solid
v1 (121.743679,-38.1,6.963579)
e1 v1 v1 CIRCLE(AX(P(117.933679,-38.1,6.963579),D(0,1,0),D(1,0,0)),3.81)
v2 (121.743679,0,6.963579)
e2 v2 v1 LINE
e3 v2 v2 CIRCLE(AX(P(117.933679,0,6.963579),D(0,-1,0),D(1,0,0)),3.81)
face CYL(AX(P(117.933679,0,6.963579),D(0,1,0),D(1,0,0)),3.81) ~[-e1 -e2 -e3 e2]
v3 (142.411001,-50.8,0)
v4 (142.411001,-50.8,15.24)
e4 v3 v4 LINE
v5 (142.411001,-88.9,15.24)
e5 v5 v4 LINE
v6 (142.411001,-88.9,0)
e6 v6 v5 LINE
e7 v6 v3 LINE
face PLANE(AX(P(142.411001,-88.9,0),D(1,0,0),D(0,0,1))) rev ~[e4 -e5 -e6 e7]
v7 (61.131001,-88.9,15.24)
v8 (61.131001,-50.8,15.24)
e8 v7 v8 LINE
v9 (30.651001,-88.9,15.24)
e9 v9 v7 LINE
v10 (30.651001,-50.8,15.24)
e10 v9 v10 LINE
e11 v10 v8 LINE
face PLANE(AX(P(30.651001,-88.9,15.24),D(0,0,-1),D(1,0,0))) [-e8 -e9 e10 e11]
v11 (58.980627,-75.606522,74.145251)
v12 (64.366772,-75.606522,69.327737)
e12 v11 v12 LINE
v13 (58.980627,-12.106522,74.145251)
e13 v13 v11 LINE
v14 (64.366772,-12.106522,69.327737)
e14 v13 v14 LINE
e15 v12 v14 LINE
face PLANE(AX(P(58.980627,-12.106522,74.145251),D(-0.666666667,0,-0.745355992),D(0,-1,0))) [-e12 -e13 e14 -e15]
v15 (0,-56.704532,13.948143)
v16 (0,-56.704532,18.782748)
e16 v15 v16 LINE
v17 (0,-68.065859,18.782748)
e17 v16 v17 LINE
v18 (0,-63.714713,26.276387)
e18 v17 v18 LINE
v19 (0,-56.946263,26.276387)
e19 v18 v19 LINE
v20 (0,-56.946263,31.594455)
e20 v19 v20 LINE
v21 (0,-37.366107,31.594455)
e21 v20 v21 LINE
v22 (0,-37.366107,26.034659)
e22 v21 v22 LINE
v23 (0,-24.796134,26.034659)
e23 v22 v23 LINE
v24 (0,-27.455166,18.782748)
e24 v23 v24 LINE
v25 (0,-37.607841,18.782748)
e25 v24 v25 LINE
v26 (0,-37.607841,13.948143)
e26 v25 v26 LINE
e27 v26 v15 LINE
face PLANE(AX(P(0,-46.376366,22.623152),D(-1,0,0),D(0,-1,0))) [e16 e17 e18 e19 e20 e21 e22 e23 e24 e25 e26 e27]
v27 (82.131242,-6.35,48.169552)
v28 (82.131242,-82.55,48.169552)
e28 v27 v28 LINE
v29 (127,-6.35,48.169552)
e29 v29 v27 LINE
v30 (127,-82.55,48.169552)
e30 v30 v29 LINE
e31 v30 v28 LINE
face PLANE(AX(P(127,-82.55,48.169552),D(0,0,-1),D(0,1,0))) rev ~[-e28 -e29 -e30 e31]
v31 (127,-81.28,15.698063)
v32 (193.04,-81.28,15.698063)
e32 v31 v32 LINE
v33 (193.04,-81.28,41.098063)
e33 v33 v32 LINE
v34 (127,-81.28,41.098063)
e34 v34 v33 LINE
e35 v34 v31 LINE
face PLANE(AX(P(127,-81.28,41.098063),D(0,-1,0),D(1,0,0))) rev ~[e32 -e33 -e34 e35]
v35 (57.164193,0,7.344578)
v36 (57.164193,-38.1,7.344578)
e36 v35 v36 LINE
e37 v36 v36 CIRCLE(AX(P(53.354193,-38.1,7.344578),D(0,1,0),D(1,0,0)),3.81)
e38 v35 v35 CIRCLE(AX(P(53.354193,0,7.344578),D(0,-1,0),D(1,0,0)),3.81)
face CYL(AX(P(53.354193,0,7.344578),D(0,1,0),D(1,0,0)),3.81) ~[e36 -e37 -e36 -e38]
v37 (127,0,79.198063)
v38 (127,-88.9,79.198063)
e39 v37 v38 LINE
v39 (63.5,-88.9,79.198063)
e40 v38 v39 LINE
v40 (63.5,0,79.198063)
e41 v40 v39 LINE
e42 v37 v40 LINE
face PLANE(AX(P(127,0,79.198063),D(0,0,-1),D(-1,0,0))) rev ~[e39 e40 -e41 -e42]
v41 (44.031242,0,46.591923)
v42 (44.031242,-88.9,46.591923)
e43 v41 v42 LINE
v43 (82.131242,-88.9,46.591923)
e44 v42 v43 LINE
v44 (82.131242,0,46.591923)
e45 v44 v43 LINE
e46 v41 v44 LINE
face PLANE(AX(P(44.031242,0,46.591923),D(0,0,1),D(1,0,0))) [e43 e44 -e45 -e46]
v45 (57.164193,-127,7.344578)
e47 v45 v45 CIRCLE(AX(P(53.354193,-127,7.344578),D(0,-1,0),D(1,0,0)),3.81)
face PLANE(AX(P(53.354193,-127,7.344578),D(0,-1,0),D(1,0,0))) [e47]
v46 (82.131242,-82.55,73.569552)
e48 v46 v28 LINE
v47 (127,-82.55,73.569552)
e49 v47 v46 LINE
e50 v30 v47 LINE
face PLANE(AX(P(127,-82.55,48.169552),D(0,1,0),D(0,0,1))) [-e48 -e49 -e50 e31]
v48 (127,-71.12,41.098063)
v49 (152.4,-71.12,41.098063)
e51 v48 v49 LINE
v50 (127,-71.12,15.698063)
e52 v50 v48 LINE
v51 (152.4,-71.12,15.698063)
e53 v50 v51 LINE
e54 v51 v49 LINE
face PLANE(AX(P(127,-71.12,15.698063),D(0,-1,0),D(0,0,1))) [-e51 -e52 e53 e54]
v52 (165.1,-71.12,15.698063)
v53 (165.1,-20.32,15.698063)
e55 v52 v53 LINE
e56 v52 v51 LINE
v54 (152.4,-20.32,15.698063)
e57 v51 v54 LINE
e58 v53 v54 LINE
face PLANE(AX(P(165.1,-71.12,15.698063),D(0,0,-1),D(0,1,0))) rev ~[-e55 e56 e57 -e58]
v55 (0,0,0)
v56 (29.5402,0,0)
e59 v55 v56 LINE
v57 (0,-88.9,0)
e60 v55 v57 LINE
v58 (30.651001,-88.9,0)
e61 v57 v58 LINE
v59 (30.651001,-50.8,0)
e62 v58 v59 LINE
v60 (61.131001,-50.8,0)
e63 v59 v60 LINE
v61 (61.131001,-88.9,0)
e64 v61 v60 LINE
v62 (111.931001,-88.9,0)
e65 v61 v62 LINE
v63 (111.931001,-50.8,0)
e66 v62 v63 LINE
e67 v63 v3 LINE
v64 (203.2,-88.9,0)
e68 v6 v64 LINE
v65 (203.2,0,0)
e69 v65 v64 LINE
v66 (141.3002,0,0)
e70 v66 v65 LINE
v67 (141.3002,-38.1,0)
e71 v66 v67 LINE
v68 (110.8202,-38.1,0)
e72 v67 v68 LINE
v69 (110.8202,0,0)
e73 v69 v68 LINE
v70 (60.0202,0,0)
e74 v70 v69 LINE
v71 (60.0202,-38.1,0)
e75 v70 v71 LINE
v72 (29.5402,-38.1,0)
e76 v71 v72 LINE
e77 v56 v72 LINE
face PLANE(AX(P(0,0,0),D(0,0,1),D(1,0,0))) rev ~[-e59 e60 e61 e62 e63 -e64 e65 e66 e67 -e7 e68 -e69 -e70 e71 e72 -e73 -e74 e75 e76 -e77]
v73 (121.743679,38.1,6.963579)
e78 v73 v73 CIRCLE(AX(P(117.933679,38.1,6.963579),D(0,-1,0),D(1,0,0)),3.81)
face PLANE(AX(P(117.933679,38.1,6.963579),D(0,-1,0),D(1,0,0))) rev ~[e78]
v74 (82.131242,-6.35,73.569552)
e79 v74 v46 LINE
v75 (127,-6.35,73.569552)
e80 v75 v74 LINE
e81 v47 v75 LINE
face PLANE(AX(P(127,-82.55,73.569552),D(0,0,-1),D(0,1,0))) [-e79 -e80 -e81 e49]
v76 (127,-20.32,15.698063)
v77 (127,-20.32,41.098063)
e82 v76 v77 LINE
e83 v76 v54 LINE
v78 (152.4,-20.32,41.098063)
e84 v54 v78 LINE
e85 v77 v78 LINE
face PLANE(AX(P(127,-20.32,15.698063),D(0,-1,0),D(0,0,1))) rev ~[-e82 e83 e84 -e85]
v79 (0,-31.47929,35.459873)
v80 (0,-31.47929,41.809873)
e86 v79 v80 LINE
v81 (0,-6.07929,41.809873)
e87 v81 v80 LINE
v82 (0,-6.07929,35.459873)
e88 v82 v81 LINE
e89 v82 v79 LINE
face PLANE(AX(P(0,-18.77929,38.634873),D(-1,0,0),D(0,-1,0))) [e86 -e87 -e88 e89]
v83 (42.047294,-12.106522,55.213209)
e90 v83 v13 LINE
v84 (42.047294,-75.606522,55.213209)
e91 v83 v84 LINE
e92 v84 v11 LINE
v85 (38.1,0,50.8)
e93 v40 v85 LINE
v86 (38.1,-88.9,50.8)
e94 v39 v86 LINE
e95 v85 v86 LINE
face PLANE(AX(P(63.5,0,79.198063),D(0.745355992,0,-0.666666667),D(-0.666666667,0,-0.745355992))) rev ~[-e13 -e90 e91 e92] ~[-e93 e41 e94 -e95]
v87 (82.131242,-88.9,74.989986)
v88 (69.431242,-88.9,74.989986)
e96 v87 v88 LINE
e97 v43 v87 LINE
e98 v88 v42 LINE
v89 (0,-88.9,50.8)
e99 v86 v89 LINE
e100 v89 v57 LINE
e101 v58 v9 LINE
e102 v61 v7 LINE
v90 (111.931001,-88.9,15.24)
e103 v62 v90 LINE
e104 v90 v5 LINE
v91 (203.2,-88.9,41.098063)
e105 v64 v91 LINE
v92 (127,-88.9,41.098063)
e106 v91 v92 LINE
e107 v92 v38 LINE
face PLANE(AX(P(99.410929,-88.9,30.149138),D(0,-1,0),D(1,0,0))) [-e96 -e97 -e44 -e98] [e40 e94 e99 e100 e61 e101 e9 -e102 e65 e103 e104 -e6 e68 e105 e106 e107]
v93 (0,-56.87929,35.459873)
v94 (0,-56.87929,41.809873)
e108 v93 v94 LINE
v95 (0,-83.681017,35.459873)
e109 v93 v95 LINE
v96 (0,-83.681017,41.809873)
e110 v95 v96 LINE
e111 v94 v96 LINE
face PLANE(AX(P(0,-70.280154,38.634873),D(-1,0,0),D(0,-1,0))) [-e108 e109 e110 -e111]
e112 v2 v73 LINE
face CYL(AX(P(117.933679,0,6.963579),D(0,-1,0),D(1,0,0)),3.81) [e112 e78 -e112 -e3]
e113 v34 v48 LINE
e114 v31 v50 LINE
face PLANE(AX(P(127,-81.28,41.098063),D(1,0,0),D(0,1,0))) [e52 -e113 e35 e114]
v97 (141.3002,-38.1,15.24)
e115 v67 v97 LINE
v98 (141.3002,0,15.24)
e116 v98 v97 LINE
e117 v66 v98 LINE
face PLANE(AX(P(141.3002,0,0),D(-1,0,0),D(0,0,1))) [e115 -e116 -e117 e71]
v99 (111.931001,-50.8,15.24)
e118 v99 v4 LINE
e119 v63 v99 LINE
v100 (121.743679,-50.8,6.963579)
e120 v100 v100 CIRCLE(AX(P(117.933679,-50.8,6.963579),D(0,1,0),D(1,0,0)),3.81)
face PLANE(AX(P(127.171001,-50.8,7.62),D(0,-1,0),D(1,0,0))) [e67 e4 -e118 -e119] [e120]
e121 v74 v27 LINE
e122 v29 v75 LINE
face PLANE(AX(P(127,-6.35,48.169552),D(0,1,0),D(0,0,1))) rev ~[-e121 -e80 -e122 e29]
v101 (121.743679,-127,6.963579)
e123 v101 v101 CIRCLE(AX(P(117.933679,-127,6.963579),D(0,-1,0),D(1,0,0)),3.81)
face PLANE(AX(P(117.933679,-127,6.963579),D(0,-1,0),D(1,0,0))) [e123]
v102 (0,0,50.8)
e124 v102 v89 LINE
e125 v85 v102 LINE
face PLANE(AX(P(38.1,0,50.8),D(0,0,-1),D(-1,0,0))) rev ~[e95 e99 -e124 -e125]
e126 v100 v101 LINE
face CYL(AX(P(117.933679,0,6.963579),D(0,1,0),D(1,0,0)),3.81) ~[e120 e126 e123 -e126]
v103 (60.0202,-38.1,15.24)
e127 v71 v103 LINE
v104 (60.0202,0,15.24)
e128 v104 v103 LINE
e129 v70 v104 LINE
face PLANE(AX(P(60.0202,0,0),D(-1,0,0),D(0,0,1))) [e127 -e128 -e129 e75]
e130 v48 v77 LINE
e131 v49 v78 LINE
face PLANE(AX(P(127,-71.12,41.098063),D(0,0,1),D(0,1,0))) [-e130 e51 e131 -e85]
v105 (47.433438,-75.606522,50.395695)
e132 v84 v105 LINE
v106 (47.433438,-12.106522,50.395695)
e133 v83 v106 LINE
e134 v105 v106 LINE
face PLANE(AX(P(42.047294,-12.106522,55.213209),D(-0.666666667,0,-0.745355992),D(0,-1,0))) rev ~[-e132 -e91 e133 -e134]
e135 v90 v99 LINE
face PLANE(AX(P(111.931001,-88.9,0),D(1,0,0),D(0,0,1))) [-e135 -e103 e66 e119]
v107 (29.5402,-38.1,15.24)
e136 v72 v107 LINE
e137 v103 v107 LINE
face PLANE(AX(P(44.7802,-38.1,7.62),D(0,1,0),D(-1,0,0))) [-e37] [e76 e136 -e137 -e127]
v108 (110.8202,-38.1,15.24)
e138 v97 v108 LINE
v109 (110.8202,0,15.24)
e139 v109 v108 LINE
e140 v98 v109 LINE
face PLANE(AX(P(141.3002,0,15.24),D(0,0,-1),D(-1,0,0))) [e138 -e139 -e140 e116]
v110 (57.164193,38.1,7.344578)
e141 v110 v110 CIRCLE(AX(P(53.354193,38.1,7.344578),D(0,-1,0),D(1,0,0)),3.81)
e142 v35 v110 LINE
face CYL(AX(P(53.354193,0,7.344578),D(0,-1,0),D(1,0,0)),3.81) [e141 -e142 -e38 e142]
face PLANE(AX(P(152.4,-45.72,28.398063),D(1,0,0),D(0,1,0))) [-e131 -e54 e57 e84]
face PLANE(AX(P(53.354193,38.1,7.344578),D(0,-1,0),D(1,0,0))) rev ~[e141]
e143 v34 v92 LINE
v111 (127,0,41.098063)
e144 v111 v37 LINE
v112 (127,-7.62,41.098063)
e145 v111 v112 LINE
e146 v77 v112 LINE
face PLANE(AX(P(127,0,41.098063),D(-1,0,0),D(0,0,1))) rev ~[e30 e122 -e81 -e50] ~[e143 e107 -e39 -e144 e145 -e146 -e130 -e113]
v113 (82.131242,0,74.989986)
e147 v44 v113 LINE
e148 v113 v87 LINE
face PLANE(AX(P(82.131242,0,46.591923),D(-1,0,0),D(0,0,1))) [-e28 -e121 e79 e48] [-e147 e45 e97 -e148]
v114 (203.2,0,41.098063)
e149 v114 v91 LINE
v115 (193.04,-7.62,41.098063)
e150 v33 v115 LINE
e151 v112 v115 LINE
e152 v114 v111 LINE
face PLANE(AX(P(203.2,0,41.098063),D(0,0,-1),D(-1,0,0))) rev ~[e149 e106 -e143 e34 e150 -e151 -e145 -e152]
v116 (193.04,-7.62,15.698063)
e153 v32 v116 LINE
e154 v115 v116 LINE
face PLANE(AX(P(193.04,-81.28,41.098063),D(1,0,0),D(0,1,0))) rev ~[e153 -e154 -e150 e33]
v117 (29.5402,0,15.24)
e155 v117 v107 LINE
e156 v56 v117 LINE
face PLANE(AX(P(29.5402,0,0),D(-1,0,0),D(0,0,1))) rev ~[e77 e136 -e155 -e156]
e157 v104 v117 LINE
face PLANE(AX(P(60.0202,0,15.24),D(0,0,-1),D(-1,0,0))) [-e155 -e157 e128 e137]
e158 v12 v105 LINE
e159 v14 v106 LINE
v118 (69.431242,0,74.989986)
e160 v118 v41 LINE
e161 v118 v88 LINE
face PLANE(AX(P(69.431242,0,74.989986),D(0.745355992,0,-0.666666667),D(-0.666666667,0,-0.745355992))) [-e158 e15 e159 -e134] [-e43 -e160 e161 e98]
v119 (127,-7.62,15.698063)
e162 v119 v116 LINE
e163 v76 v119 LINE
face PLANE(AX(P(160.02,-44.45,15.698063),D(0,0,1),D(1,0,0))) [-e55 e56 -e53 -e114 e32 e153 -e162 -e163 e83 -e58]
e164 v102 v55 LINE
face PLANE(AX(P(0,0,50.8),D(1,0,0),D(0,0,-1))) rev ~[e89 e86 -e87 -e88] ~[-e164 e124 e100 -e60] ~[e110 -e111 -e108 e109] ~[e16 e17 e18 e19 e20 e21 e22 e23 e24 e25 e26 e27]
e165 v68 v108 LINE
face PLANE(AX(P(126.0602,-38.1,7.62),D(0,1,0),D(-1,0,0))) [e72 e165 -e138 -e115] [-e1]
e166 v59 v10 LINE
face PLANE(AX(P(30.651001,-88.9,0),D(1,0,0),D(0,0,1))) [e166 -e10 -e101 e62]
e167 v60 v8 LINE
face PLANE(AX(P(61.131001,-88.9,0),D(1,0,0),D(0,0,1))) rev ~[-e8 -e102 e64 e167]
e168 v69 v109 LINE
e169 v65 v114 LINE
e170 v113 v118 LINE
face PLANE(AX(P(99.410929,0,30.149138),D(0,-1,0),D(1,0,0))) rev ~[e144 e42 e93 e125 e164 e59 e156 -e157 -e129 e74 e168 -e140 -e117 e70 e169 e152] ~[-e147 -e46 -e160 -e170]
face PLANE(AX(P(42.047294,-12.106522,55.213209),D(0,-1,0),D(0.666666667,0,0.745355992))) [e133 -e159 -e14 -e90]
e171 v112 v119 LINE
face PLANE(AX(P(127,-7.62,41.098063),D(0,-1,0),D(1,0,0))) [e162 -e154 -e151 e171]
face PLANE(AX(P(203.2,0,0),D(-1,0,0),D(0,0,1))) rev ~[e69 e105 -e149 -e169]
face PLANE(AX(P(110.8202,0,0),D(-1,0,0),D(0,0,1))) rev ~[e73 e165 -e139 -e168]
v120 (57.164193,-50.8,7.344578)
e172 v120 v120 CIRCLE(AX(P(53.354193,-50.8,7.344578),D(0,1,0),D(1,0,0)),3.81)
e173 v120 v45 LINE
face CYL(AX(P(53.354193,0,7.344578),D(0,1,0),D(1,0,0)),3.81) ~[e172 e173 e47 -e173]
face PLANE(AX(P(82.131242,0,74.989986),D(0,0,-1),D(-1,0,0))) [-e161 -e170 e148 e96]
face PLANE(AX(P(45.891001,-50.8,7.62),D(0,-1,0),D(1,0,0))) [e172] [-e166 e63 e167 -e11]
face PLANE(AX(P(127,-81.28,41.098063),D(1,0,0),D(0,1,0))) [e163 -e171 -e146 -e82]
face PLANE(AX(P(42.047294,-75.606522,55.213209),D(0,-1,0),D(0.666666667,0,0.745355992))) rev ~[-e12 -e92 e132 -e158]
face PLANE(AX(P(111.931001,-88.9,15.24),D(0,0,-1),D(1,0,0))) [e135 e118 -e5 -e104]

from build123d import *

# Parameters (mm, degrees)
F0_W          = 30.48
F0_H          = 15.24
F1_DEPTH      = 88.9
F2_W          = 30.48
F2_H          = 15.24
F3_DEPTH      = 38.1
F4_W          = 30.48
F4_H          = 15.24
F5_DEPTH      = 38.1
F6_R          = 3.81
F7_DEPTH      = 127
F7_DEPTH_BACK = 38.1
F9_DEPTH      = 88.9
F10_W         = 66.04
F10_H         = 73.66
F11_DEPTH     = 25.4
F12_W         = 63.5
F12_H         = 25.4
F13_DEPTH     = 12.7
F15_W         = 76.2
F15_H         = 25.4
F16_DEPTH     = 50.8
F18_DEPTH     = 7.62
F19_W         = 26.801726786
F19_H         = 6.35
F14_W         = 25.4
F14_H         = 6.35
F20_DEPTH     = 12.7
F21_DEPTH     = 12.7
F22_W         = 50.8
F22_H         = 25.4
F23_DEPTH     = 38.1
F24_DEPTH     = 12.7


# Not quite as in the source:
# - a feature names something its author has since deleted; it is built from what else it names


with BuildPart() as f1:
    # F0 (on Front) → F1 (new body)
    with BuildSketch(Plane.XZ):
        Polygon((0, 50.8), (0, 0), (29.5417681336, 0), (29.5417681336, 15.24), (60.0217681336, 15.24), (60.0217681336, 0), (121.1203709245, 0), (121.1203709245, 15.24), (151.6003709245, 15.24), (151.6003709245, 0), (203.2, 0), (203.2, 41.0980633142), (127, 41.0980633142), (127, 79.1980633142), (63.5, 79.1980633142), (38.1, 50.8), align=None)
        with Locations((44.7817681336, 7.62)):
            Rectangle(F0_W, F0_H)
        with Locations((136.3603709245, 7.62)):
            Rectangle(F0_W, F0_H)
    extrude(amount=F1_DEPTH)

    # F2 (on face) → F3 (cut)
    with BuildSketch(Plane.XZ.offset(88.9)):
        with Locations((45.8910012597, 7.62)):
            Rectangle(F2_W, F2_H)
        with Locations((127.1710012597, 7.62)):
            Rectangle(F2_W, F2_H)
    extrude(amount=-F3_DEPTH, mode=Mode.SUBTRACT)

    # F4 (on face) → F5 (cut)
    with BuildSketch(Plane(origin=(0, 0, 0), x_dir=(-1, 0, 0), z_dir=(0, 1, 0))):
        with Locations((-126.0602, 7.62)):
            Rectangle(F4_W, F4_H)
        with Locations((-44.7802, 7.62)):
            Rectangle(F4_W, F4_H)
    extrude(amount=-F5_DEPTH, mode=Mode.SUBTRACT)

    # F6 (on Front) → F7 (join, two sides)
    with BuildSketch(Plane.XZ) as f7_sk:
        with Locations((53.3541933731, 7.3445781872)):
            Circle(F6_R)
        with Locations((117.9336786941, 6.9635785541)):
            Circle(F6_R)
    extrude(amount=F7_DEPTH)
    extrude(f7_sk.sketch, amount=-F7_DEPTH_BACK)

    # F8 (on Front) → F9 (cut)
    with BuildSketch(Plane.XZ):
        Polygon((69.4312418273, 74.989986462), (44.0312418273, 46.5919231478), (82.1312418273, 46.5919231478), (82.1312418273, 74.989986462), align=None)
    extrude(amount=F9_DEPTH, mode=Mode.SUBTRACT)

    # F10 (on face) → F11 (cut)
    with BuildSketch(Plane.XY.offset(41.0980633142)):
        with Locations((160.02, -44.45)):
            Rectangle(F10_W, F10_H)
    extrude(amount=-F11_DEPTH, mode=Mode.SUBTRACT)

    # F12 (on face) → F13 (cut)
    with BuildSketch(Plane(origin=(-4.0760562793, 0, 3.6457355683), x_dir=(0, -1, 0), z_dir=(-0.7453559925, 0, 0.6666666667))):
        with Locations((43.8565216027, 81.8850251743)):
            Rectangle(F12_W, F12_H)
    extrude(amount=-F13_DEPTH, mode=Mode.SUBTRACT)

    # F15 (on face) → F16 (cut)
    with BuildSketch(Plane.YZ.offset(127)):
        with Locations((-44.45, 60.8695521951)):
            Rectangle(F15_W, F15_H)
    extrude(amount=-F16_DEPTH, mode=Mode.SUBTRACT)

    # F17 (on face) → F18 (join)
    with BuildSketch(Plane(origin=(0, 0, 0), x_dir=(0, -1, 0), z_dir=(-1, 0, 0))):
        Polygon((56.9462627172, 26.2763872743), (56.9462627172, 31.5944552422), (37.3661071062, 31.5944552422), (37.3661071062, 26.0346587747), (24.7961338609, 26.0346587747), (27.4551659822, 18.7827479094), (37.6078411937, 18.7827479094), (37.6078411937, 13.9481425285), (56.7045323551, 13.9481425285), (56.7045323551, 18.7827479094), (68.0658593774, 18.7827479094), (63.7147128582, 26.2763872743), align=None)
    extrude(amount=-F18_DEPTH)

    # F19 (on face) + F14 (on face) → F20 (join)
    with BuildSketch(Plane(origin=(0, 0, 0), x_dir=(0, -1, 0), z_dir=(-1, 0, 0))):
        with Locations((70.2801537674, 38.6348730328)):
            Rectangle(F19_W, F19_H)
    with BuildSketch(Plane(origin=(0, 0, 0), x_dir=(0, -1, 0), z_dir=(-1, 0, 0))):
        with Locations((18.7792903744, 38.6348730328)):
            Rectangle(F14_W, F14_H)
    extrude(amount=F20_DEPTH)

    # F21 (cut): faces of the model
    f21_faces = [f1.faces().sort_by_distance(p)[0] for p in [
        (-12.7, -18.7792903744, 38.6348730328),
        (-12.7, -70.2801537674, 38.6348730328),
    ]]
    extrude(f21_faces, amount=-F21_DEPTH, mode=Mode.SUBTRACT)

    # F22 (on face) → F23 (join)
    with BuildSketch(Plane.YZ.offset(127)):
        with Locations((-45.72, 28.3980633142)):
            Rectangle(F22_W, F22_H)
    extrude(amount=F23_DEPTH)

    # F24 (cut): a face of the model
    f24_faces = [f1.faces().sort_by_distance(p)[0] for p in [
        (165.1, -45.72, 28.3980633142),
    ]]
    extrude(f24_faces, amount=-F24_DEPTH, mode=Mode.SUBTRACT)


solid = f1.part
